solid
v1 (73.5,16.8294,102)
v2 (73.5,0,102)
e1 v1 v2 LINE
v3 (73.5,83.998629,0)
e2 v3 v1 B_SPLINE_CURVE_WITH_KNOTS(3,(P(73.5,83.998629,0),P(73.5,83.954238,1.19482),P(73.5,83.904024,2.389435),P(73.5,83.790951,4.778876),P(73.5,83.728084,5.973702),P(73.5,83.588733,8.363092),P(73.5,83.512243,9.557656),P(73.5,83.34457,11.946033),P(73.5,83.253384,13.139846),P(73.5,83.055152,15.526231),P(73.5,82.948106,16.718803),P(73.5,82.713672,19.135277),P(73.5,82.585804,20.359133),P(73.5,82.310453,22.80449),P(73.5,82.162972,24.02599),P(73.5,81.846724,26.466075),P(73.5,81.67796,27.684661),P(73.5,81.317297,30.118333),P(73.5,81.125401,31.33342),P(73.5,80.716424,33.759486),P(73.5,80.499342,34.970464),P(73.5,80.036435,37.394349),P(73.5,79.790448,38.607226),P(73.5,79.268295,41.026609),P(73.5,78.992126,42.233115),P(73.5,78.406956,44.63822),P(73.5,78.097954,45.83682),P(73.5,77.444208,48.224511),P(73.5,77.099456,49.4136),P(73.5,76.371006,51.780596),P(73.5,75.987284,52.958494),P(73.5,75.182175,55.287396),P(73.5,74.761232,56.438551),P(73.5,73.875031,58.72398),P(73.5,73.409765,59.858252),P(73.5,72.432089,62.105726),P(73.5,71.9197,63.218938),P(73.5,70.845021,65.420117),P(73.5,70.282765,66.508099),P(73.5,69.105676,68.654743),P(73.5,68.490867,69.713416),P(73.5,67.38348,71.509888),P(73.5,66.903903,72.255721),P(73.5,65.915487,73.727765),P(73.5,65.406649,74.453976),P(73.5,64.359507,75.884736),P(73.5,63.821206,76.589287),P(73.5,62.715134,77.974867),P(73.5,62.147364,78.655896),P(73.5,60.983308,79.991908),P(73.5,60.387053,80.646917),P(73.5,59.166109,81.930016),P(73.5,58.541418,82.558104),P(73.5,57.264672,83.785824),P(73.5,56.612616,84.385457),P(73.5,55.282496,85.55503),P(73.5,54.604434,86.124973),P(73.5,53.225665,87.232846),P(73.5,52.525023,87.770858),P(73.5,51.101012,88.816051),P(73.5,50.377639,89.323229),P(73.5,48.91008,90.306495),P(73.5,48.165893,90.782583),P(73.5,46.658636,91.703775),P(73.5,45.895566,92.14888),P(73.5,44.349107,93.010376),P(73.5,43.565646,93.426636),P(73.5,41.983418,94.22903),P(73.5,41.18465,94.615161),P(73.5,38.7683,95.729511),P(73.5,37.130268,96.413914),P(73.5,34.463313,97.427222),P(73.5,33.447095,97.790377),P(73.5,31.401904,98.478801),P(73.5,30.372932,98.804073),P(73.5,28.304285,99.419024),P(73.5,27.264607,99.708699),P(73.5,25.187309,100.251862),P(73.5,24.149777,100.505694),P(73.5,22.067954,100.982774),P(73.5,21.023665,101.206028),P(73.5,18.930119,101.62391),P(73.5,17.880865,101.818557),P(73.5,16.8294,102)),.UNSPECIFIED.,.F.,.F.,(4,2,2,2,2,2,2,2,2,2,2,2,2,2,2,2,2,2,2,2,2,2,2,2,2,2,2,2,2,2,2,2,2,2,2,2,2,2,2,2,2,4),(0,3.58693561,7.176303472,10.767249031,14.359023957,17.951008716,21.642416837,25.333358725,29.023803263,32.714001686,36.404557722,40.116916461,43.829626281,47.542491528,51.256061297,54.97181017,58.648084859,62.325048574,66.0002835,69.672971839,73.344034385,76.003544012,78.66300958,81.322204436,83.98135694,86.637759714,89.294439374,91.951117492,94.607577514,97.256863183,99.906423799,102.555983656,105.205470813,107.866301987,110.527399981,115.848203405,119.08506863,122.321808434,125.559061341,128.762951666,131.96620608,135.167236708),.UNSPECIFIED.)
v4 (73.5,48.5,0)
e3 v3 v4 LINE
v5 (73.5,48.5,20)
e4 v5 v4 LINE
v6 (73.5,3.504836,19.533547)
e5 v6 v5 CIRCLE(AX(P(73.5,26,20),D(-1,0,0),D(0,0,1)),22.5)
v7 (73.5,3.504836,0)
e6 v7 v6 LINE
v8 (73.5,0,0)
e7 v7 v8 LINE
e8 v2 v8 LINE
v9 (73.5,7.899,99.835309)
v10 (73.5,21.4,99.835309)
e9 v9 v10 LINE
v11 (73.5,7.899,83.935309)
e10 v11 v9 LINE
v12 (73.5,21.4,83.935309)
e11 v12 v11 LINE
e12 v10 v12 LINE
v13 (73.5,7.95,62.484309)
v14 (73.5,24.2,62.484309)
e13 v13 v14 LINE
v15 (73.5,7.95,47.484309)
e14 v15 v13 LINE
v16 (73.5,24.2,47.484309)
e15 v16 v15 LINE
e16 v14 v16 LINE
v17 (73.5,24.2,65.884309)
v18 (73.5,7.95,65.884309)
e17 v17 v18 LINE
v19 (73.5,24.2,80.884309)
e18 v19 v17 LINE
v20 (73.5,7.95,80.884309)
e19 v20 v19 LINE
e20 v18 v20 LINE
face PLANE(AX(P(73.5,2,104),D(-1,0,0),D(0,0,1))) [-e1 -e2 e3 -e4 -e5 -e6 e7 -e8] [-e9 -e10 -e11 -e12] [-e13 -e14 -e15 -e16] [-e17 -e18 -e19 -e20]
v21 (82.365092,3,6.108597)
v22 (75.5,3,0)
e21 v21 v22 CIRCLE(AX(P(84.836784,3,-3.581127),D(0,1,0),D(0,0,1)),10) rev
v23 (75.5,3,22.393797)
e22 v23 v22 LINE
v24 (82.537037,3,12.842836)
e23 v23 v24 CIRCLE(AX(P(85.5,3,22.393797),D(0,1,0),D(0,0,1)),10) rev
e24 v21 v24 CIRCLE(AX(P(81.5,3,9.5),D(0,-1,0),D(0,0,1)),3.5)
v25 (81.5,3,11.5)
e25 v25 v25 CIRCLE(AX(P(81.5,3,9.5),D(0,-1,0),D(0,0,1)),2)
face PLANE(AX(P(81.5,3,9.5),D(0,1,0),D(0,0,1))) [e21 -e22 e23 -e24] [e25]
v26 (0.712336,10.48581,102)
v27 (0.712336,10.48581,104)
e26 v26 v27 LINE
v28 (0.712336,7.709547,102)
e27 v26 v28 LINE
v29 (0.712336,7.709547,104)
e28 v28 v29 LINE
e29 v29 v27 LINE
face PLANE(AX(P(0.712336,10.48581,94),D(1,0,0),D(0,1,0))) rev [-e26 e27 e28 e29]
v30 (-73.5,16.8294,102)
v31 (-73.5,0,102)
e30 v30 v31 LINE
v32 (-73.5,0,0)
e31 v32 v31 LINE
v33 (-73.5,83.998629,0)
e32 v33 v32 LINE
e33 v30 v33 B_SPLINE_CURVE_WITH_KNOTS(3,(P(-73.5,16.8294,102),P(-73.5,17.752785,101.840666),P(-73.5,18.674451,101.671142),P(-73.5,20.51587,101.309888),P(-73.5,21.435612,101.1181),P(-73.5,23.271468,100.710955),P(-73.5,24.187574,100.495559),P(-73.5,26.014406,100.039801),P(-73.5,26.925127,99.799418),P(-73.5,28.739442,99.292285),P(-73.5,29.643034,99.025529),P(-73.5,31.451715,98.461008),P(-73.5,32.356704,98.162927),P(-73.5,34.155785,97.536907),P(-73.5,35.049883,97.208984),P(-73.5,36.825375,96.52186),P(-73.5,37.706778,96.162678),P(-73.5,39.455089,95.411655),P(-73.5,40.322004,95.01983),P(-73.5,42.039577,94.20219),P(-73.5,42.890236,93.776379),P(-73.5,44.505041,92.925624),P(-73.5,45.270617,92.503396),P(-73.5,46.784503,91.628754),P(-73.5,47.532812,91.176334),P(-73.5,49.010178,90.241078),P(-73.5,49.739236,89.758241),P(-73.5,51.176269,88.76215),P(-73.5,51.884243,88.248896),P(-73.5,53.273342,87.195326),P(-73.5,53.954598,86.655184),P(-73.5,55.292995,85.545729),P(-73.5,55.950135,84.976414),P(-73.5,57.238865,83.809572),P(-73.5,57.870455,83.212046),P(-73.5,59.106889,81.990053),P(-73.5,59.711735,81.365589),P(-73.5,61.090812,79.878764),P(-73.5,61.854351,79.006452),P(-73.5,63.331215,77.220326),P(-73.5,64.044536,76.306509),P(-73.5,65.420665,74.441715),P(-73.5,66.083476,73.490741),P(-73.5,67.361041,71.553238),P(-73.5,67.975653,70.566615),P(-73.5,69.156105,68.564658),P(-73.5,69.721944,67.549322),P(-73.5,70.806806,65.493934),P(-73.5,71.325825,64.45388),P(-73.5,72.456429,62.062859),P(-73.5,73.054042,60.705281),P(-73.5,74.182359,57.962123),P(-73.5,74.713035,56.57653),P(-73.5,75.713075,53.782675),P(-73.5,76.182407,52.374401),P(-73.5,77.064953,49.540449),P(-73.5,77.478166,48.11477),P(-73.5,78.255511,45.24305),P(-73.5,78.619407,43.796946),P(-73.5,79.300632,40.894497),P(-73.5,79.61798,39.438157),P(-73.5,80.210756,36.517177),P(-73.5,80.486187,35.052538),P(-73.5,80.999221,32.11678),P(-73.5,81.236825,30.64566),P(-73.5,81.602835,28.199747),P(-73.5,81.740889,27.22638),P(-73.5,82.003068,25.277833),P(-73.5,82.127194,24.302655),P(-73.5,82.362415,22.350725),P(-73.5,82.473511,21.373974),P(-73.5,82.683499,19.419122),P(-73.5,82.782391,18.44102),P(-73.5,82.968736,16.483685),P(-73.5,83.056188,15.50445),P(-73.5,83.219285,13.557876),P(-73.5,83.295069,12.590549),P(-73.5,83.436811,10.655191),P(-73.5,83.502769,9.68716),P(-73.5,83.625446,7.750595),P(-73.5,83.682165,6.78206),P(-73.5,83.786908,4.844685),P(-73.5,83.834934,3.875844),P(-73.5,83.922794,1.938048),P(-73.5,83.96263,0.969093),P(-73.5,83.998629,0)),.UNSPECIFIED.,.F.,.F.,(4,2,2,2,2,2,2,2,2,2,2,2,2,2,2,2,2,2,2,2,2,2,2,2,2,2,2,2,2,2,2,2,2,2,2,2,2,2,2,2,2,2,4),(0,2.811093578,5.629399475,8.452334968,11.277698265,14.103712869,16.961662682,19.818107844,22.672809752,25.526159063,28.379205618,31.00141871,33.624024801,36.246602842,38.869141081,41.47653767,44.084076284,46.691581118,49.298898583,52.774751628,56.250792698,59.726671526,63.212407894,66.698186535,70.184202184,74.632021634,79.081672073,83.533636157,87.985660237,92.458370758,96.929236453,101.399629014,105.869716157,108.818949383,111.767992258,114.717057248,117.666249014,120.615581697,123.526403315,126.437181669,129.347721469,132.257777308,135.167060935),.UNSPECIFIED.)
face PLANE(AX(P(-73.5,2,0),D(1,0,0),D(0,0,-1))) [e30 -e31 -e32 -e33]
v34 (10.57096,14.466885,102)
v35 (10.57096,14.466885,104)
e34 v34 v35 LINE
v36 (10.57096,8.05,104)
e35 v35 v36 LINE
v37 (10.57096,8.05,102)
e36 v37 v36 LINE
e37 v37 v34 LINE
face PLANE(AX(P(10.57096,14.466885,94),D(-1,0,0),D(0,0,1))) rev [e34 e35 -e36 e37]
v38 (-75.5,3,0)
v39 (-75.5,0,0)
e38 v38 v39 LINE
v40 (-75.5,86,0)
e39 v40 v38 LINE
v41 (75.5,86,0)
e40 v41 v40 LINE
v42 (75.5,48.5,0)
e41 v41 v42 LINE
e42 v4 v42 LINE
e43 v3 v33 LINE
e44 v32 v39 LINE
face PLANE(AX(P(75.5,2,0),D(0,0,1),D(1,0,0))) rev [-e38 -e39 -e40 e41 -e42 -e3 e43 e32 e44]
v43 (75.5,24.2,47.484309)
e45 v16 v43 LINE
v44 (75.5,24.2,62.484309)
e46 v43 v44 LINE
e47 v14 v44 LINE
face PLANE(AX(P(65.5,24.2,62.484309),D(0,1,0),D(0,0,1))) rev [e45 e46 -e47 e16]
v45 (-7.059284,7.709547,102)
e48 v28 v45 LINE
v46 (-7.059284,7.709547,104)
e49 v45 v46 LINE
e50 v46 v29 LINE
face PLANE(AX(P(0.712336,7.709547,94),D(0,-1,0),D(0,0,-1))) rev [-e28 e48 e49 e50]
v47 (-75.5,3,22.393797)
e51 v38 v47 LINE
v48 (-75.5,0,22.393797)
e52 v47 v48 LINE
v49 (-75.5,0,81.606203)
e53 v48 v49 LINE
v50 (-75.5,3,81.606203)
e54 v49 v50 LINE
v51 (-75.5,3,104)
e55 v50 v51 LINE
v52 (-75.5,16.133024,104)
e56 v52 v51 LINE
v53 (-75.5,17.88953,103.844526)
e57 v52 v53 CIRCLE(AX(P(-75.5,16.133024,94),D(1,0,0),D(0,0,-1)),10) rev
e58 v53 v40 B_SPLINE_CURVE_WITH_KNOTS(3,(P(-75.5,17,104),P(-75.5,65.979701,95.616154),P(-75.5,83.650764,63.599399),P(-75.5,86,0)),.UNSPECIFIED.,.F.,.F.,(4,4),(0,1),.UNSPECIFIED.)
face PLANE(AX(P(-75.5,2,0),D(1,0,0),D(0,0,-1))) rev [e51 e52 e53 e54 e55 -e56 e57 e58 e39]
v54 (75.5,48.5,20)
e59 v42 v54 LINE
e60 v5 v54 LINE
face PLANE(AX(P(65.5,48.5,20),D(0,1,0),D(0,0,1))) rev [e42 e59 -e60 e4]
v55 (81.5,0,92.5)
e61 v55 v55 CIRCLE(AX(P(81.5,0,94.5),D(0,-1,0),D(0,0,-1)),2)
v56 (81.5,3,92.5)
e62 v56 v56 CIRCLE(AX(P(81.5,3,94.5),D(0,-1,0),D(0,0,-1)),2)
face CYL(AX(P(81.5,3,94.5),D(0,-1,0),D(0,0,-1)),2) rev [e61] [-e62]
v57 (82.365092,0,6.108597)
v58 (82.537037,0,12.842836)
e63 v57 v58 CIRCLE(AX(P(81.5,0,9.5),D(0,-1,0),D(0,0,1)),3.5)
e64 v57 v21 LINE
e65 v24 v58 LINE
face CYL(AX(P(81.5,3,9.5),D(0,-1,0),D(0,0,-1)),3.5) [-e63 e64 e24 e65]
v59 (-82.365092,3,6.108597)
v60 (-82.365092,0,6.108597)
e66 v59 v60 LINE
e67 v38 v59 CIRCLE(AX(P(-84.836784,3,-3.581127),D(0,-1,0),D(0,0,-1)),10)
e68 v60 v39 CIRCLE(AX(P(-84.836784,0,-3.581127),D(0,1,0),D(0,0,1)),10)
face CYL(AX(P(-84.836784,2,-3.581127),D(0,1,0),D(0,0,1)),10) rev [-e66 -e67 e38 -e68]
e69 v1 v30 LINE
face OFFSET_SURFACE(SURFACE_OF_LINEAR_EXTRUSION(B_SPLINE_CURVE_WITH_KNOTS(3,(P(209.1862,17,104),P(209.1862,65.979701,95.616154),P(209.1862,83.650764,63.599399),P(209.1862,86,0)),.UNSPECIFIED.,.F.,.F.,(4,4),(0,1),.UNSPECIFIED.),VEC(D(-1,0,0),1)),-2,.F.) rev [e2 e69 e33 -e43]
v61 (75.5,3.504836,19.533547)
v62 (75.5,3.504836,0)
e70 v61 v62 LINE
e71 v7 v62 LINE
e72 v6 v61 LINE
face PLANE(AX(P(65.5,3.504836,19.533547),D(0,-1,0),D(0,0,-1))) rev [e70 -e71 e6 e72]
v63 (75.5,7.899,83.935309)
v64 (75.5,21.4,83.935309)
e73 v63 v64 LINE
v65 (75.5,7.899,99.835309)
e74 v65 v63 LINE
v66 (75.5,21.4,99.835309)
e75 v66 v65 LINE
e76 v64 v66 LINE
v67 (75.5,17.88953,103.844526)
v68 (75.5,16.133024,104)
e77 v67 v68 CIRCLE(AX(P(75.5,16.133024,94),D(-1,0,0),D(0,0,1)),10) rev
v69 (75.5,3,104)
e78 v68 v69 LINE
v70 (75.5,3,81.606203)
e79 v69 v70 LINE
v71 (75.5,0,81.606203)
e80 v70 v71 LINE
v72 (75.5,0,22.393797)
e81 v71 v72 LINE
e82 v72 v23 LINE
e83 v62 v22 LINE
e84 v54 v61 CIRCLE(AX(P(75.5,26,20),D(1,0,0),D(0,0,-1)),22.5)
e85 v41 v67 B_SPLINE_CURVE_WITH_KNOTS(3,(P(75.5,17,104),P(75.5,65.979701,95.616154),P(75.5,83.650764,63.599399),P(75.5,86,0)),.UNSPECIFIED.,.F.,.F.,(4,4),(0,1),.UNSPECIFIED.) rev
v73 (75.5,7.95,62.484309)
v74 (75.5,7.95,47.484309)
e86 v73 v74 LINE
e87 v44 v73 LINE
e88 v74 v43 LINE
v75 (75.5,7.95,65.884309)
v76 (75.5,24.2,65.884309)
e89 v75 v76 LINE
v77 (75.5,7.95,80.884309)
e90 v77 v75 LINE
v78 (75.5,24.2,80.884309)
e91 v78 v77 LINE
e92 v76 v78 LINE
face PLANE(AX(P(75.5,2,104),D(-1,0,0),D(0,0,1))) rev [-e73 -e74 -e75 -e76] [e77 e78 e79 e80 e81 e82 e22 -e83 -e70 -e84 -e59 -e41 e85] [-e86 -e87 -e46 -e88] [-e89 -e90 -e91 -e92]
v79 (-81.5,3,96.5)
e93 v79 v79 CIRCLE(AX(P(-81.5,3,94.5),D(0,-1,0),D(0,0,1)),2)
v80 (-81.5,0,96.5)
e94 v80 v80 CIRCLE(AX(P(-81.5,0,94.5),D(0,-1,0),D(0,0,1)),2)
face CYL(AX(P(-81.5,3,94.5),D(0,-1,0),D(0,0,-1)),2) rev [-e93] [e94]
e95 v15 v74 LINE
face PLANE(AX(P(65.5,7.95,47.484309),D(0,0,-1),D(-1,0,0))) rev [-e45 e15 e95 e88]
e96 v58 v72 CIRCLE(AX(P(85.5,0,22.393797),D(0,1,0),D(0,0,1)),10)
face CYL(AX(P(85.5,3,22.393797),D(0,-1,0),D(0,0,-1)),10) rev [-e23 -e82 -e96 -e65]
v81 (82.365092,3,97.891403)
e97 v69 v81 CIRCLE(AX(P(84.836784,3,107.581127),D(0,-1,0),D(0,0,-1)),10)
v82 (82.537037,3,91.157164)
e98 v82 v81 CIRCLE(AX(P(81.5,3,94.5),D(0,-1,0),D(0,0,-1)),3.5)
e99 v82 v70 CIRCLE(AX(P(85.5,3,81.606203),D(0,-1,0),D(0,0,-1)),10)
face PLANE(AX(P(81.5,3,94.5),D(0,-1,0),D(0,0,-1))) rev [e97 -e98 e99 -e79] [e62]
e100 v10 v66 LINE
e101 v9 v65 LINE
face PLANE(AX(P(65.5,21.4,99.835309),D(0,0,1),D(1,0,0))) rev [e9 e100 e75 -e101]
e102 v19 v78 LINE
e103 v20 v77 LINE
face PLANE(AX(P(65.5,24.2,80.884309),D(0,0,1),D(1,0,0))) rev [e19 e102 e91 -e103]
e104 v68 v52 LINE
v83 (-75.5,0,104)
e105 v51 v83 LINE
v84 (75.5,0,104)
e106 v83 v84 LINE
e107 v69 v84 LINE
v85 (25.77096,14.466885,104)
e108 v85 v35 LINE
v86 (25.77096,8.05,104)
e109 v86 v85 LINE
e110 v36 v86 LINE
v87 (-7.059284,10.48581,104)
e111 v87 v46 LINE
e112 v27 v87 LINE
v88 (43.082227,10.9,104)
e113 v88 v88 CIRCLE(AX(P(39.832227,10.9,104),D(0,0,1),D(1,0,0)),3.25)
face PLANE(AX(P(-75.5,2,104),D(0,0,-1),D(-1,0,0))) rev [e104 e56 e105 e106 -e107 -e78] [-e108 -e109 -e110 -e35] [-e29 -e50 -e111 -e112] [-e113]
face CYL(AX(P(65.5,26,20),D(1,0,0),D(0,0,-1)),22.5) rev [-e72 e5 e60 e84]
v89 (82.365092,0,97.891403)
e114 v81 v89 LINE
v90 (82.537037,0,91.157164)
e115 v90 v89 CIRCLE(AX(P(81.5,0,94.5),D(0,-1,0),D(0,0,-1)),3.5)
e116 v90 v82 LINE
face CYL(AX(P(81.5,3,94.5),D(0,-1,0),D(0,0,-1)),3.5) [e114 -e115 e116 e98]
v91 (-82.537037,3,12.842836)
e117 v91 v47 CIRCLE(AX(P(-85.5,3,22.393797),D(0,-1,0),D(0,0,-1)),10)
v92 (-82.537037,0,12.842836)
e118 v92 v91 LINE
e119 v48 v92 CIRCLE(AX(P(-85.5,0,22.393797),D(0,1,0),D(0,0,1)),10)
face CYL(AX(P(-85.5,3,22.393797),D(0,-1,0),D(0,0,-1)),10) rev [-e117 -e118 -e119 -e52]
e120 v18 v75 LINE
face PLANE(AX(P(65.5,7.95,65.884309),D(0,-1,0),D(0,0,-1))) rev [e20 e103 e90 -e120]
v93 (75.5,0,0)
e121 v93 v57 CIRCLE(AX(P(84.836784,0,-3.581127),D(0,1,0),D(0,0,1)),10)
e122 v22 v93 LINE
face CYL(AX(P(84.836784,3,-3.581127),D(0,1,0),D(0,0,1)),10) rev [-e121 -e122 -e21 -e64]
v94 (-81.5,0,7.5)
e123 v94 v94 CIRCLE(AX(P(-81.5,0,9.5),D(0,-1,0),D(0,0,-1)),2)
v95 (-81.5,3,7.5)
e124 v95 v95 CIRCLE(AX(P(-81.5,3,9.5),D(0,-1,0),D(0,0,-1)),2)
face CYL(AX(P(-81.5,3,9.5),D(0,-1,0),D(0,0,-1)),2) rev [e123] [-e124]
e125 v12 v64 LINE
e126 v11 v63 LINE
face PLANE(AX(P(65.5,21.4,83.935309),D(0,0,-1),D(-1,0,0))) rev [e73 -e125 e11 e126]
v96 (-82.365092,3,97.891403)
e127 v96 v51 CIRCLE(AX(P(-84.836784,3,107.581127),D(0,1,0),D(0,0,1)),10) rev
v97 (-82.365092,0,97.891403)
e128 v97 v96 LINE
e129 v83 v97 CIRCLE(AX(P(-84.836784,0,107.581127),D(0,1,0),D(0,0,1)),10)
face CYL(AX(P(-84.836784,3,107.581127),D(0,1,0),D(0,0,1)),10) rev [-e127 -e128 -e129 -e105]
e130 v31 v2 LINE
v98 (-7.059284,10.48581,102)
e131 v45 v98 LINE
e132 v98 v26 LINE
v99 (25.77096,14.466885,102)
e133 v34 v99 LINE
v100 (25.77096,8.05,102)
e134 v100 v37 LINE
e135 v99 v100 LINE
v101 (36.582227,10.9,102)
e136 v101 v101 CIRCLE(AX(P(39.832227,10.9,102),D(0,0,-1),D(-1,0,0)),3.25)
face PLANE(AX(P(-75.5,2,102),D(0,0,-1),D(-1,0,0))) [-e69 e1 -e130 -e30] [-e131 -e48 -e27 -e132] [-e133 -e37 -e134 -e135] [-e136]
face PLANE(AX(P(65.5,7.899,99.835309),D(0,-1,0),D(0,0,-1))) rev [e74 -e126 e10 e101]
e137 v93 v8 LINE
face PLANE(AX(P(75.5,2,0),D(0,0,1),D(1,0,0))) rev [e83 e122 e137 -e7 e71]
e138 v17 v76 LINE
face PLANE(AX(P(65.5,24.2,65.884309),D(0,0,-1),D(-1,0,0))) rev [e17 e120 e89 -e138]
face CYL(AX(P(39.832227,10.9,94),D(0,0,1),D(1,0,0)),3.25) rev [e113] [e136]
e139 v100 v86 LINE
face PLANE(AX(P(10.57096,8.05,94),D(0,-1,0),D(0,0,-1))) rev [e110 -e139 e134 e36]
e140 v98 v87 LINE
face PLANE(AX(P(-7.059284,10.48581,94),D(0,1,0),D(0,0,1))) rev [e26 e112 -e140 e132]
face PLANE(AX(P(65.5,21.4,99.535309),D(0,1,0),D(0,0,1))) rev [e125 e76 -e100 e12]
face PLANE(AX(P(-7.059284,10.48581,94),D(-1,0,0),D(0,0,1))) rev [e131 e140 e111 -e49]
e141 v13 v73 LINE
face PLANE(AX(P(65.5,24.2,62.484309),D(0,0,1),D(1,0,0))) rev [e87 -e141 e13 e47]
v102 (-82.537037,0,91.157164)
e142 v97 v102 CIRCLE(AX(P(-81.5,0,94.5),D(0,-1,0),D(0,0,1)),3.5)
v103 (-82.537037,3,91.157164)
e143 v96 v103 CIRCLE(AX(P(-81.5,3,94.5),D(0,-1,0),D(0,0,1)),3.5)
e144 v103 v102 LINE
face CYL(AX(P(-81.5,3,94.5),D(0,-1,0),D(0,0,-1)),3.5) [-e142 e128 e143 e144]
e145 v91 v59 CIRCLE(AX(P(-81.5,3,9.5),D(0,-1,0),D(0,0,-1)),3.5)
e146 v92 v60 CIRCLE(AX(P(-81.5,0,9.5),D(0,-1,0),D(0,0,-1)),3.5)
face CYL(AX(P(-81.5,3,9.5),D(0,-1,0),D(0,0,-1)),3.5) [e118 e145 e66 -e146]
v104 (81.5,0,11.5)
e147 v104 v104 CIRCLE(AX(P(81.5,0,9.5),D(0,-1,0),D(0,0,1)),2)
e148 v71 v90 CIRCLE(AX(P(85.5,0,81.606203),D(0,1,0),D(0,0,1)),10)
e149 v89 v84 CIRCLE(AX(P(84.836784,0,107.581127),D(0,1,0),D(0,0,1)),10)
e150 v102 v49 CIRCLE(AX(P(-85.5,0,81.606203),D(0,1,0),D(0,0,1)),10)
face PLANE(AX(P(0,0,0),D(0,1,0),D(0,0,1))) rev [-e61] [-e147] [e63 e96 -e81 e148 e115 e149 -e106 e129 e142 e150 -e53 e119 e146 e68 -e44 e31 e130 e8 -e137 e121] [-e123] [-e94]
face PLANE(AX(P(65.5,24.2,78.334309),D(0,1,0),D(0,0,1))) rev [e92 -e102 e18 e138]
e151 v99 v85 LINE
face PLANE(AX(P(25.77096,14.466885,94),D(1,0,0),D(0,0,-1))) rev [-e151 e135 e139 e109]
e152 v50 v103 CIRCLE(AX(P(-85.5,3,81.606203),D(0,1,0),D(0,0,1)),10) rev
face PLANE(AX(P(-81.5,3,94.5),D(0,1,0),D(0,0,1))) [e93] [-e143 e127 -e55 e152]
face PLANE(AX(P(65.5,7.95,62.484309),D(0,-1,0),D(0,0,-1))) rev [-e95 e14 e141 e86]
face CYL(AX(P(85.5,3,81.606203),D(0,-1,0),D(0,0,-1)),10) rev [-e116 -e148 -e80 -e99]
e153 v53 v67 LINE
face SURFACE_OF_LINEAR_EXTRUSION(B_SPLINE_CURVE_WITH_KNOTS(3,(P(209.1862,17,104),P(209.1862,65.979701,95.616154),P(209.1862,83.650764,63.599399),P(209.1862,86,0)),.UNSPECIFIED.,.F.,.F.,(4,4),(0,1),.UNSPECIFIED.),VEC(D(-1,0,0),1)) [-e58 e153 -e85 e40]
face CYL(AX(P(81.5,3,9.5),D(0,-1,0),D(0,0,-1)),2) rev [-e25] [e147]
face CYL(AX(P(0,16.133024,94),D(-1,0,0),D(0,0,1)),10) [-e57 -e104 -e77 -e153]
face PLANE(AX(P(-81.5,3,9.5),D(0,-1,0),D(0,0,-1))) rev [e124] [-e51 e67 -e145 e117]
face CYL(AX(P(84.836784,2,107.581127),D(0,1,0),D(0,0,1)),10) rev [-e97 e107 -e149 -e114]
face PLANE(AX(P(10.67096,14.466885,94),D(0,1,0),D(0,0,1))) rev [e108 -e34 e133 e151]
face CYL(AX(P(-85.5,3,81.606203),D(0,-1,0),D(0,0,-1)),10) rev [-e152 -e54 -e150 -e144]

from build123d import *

# Parameters (mm, degrees)
SKETCH2_W           = 151
SKETCH2_H           = 104
BOSS_EXTRUDE1_DEPTH = 2
BOSS_EXTRUDE2_DEPTH = 151
SHELL1_T            = -2
SKETCH4_R           = 3.25
CUT_EXTRUDE1_DEPTH  = 10
SKETCH5_W           = 15
SKETCH5_H           = 16.25
CUT_EXTRUDE2_DEPTH  = 10
FILLET3_R           = 10
CUT_EXTRUDE3_DEPTH  = 10
SKETCH7_R           = 2
BOSS_EXTRUDE3_DEPTH = 3
FILLET4_DEPTH       = 3
FILLET5_R           = 10
SKETCH9_W           = 147
SKETCH9_H           = 102
CUT_EXTRUDE5_DEPTH  = 10


with BuildPart() as part:
    # Sketch2 → Boss-Extrude1 (new body)
    with BuildSketch(Plane(origin=(0, 0, 0), x_dir=(1, 0, 0), z_dir=(0, 1, 0))):
        with Locations((0, -52)):
            Rectangle(SKETCH2_W, SKETCH2_H)
    extrude(amount=BOSS_EXTRUDE1_DEPTH)

    # Sketch3 → Boss-Extrude2 (add)
    with BuildSketch(Plane.ZY.offset(75.5)):
        with BuildLine():
            Line((0, 86), (0, 2))
            Line((0, 2), (104, 2))
            Line((104, 2), (104, 17))
            add(Edge.make_bspline(
                [(0, 86), (63.599399009, 83.650763879), (95.616153821, 65.97970086), (104, 17)],
                knots=[0, 0, 0, 0, 1, 1, 1, 1], degree=3))
        make_face()
    extrude(amount=-BOSS_EXTRUDE2_DEPTH)

    # Shell1
    shell1_openings = [part.faces().sort_by_distance(p)[0] for p in [
        (0, 43, 0),
    ]]
    offset(amount=SHELL1_T, openings=shell1_openings, kind=Kind.INTERSECTION)

    # Sketch4 → Cut-Extrude1 (cut)
    with BuildSketch(Plane.XY.offset(104)):
        with Locations((39.832226511, 10.9)):
            Circle(SKETCH4_R)
        Polygon((-7.059283816, 10.485810058), (-7.059283816, 7.709546788), (-6.933696011, 7.709546788), (0.586748493, 7.709546788), (0.712336299, 7.709546788), (0.712336299, 10.485810058), (0.586748493, 10.485810058), (-0.123473759, 10.485810058), (-6.223473759, 10.485810058), (-6.933696011, 10.485810058), align=None)
        Polygon((12.260960064, 8.05), (14.595960064, 8.05), (25.670959902, 8.05), (25.770960048, 8.05), (25.770960048, 14.466884605), (25.670960048, 14.466884605), (10.670959945, 14.466884605), (10.570959945, 14.466884605), (10.570959945, 8.05), (10.670960001, 8.05), align=None)
    extrude(amount=-CUT_EXTRUDE1_DEPTH, mode=Mode.SUBTRACT)

    # Sketch5 → Cut-Extrude2 (cut)
    with BuildSketch(Plane(origin=(75.5, 0, 0), x_dir=(0, 0, -1), z_dir=(1, 0, 0))):
        Polygon((-99.83530855, 21.4), (-99.83530855, 7.899), (-83.93530855, 7.899), (-83.93530855, 21.4), (-99.53530855, 21.4), align=None)
        Polygon((-65.884309216, 7.95), (-80.884309216, 7.95), (-80.884309216, 21.65), (-80.884309216, 24.2), (-78.334309216, 24.2), (-65.884309216, 24.2), align=None)
        with Locations((-54.984309216, 16.075)):
            Rectangle(SKETCH5_W, SKETCH5_H)
    extrude(amount=-CUT_EXTRUDE2_DEPTH, mode=Mode.SUBTRACT)

    # Fillet3
    fillet3_edges = [part.edges().sort_by_distance(p)[0] for p in [
        (0, 17, 104),
    ]]
    fillet(fillet3_edges, radius=FILLET3_R)

    # Sketch6 → Cut-Extrude3 (cut)
    with BuildSketch(Plane(origin=(75.5, 0, 0), x_dir=(0, 0, -1), z_dir=(1, 0, 0))):
        with BuildLine():
            Line((-20, 48.5), (0, 48.5))
            Line((0, 48.5), (0, 3.504835596))
            Line((0, 3.504835596), (-19.533546963, 3.504835596))
            ThreePointArc((-19.533546963, 3.504835596), (-42.498791069, 25.766760949), (-20, 48.5))
        make_face()
    extrude(amount=-CUT_EXTRUDE3_DEPTH, mode=Mode.SUBTRACT)

    # Sketch7 → Boss-Extrude3 (add)
    # profile 1 of 4: a face of its own
    with BuildSketch(Plane.XZ):
        with BuildLine():
            Line((75.5, 98), (75.5, 91))
            Line((75.5, 91), (81.5, 91))
            ThreePointArc((81.5, 91), (85, 94.5), (81.5, 98))
            Line((81.5, 98), (75.5, 98))
        make_face()
        with Locations(Location((81.5, 94.5, 0), (0, 0, 270))):
            Circle(SKETCH7_R, mode=Mode.SUBTRACT)
    # profile 2 of 4: a face of its own
    with BuildSketch(Plane.XZ):
        with BuildLine():
            Line((-81.5, 91), (-75.5, 91))
            Line((-75.5, 91), (-75.5, 98))
            Line((-75.5, 98), (-81.5, 98))
            ThreePointArc((-81.5, 98), (-85, 94.5), (-81.5, 91))
        make_face()
        with Locations(Location((-81.5, 94.5, 0), (0, 0, 90))):
            Circle(SKETCH7_R, mode=Mode.SUBTRACT)
    # profile 3 of 4: a face of its own
    with BuildSketch(Plane.XZ):
        with BuildLine():
            Line((-75.5, 6), (-75.5, 13))
            Line((-75.5, 13), (-81.5, 13))
            ThreePointArc((-81.5, 13), (-85, 9.5), (-81.5, 6))
            Line((-81.5, 6), (-75.5, 6))
        make_face()
        with Locations(Location((-81.5, 9.5, 0), (0, 0, 270))):
            Circle(SKETCH7_R, mode=Mode.SUBTRACT)
    # profile 4 of 4: a face of its own
    with BuildSketch(Plane.XZ):
        with BuildLine():
            Line((81.5, 13), (75.5, 13))
            Line((75.5, 13), (75.5, 6))
            Line((75.5, 6), (81.5, 6))
            ThreePointArc((81.5, 6), (85, 9.5), (81.5, 13))
        make_face()
        with Locations(Location((81.5, 9.5, 0), (0, 0, 90))):
            Circle(SKETCH7_R, mode=Mode.SUBTRACT)
    extrude(amount=-BOSS_EXTRUDE3_DEPTH)

    # Fillet4: read off the stored shape, not the designer's step
    # Fillet4 outline → Fillet4 (add)
    with BuildSketch(Plane(origin=(0, 0, 0), x_dir=(1, 0, 0), z_dir=(0, 1, 0))):
        with BuildLine():
            ThreePointArc((-81.5, -13), (-82.024439287, -12.960486011), (-82.537037037, -12.842836248))
            ThreePointArc((-82.537037037, -12.842836248), (-77.449235141, -16.462086818), (-75.5, -22.393796958))
            Line((-75.5, -22.393796958), (-75.5, -13))
            Line((-75.5, -13), (-81.5, -13))
        make_face()
        with BuildLine():
            ThreePointArc((-75.5, 0), (-78.189320969, -3.889565288), (-82.365092102, -6.108596801))
            ThreePointArc((-82.365092102, -6.108596801), (-81.935940825, -6.027255322), (-81.5, -6))
            Line((-81.5, -6), (-75.5, -6))
            Line((-75.5, -6), (-75.5, 0))
        make_face()
    extrude(amount=FILLET4_DEPTH)

    # Fillet5
    # the kernel refuses this fillet: 10 mm, written as the material it adds along each edge
    with BuildSketch(Plane(origin=(75.5, 0, 13), x_dir=(0, 0, 1), z_dir=(0, 1, 0)), Plane(origin=(-75.5, 0, 91), x_dir=(0, 0, -1), z_dir=(0, 1, 0))) as fillet5_piece_1:
        with BuildLine():
            CenterArc((9.393796958, 10), FILLET5_R, 197.235285257, 72.764714743)
            Line((-0.157163752, 7.037037037), (-1.112259823, 6.740740741))
            ThreePointArc((-1.112259823, 6.740740741), (-1, 6), (-1, 0))
            Line((-1, 0), (0, -1))
            Line((0, -1), (9.393796958, -1))
            Line((9.393796958, -1), (9.393796958, 0))
        make_face()
    extrude(amount=3)
    with BuildSketch(Plane(origin=(75.5, 0, 6), x_dir=(0, 0, -1), z_dir=(0, 1, 0)), Plane(origin=(-75.5, 0, 98), x_dir=(0, 0, 1), z_dir=(0, 1, 0))) as fillet5_piece_2:
        with BuildLine():
            CenterArc((9.581126623, -9.33678382), FILLET5_R, 110.984333313, 54.705605323)
            Line((-0.108596801, -6.865092102), (-1.077569144, -6.61792293))
            ThreePointArc((-1.077569144, -6.61792293), (-1, -6), (-1, 0))
            Line((-1, 0), (0, 1))
            ThreePointArc((0, 1), (3, 1), (5.641887338, 0.933678382))
            Line((5.641887338, 0.933678382), (6, 0))
        make_face()
    extrude(amount=3)
    with BuildSketch(Plane(origin=(75.5, 0, 91), x_dir=(0, 0, -1), z_dir=(0, 1, 0))) as fillet5_piece_3:
        with BuildLine():
            CenterArc((9.393796958, -10), FILLET5_R, 90, 72.764714743)
            Line((-0.157163752, -7.037037037), (-1.112259823, -6.740740741))
            ThreePointArc((-1.112259823, -6.740740741), (-1, -6), (-1, 0))
            Line((-1, 0), (0, 1))
            Line((0, 1), (9.393796958, 1))
            Line((9.393796958, 1), (9.393796958, 0))
        make_face()
    extrude(amount=3)
    with BuildSketch(Plane(origin=(75.5, 0, 98), x_dir=(0, 0, 1), z_dir=(0, 1, 0))) as fillet5_piece_4:
        with BuildLine():
            CenterArc((9.581126623, 9.33678382), FILLET5_R, 194.310061364, 54.705605323)
            Line((-0.108596801, 6.865092102), (-1.077569144, 6.61792293))
            ThreePointArc((-1.077569144, 6.61792293), (-1, 6), (-1, 0))
            Line((-1, 0), (0, -1))
            ThreePointArc((0, -1), (3, -1), (5.641887338, -0.933678382))
            Line((5.641887338, -0.933678382), (6, 0))
        make_face()
    extrude(amount=3)

    # Sketch9 → Cut-Extrude5 (cut)
    with BuildSketch(Plane(origin=(0, 2, 0), x_dir=(1, 0, 0), z_dir=(0, 1, 0))):
        with Locations((0, -51)):
            Rectangle(SKETCH9_W, SKETCH9_H)
    extrude(amount=-CUT_EXTRUDE5_DEPTH, mode=Mode.SUBTRACT)


solid = part.part
